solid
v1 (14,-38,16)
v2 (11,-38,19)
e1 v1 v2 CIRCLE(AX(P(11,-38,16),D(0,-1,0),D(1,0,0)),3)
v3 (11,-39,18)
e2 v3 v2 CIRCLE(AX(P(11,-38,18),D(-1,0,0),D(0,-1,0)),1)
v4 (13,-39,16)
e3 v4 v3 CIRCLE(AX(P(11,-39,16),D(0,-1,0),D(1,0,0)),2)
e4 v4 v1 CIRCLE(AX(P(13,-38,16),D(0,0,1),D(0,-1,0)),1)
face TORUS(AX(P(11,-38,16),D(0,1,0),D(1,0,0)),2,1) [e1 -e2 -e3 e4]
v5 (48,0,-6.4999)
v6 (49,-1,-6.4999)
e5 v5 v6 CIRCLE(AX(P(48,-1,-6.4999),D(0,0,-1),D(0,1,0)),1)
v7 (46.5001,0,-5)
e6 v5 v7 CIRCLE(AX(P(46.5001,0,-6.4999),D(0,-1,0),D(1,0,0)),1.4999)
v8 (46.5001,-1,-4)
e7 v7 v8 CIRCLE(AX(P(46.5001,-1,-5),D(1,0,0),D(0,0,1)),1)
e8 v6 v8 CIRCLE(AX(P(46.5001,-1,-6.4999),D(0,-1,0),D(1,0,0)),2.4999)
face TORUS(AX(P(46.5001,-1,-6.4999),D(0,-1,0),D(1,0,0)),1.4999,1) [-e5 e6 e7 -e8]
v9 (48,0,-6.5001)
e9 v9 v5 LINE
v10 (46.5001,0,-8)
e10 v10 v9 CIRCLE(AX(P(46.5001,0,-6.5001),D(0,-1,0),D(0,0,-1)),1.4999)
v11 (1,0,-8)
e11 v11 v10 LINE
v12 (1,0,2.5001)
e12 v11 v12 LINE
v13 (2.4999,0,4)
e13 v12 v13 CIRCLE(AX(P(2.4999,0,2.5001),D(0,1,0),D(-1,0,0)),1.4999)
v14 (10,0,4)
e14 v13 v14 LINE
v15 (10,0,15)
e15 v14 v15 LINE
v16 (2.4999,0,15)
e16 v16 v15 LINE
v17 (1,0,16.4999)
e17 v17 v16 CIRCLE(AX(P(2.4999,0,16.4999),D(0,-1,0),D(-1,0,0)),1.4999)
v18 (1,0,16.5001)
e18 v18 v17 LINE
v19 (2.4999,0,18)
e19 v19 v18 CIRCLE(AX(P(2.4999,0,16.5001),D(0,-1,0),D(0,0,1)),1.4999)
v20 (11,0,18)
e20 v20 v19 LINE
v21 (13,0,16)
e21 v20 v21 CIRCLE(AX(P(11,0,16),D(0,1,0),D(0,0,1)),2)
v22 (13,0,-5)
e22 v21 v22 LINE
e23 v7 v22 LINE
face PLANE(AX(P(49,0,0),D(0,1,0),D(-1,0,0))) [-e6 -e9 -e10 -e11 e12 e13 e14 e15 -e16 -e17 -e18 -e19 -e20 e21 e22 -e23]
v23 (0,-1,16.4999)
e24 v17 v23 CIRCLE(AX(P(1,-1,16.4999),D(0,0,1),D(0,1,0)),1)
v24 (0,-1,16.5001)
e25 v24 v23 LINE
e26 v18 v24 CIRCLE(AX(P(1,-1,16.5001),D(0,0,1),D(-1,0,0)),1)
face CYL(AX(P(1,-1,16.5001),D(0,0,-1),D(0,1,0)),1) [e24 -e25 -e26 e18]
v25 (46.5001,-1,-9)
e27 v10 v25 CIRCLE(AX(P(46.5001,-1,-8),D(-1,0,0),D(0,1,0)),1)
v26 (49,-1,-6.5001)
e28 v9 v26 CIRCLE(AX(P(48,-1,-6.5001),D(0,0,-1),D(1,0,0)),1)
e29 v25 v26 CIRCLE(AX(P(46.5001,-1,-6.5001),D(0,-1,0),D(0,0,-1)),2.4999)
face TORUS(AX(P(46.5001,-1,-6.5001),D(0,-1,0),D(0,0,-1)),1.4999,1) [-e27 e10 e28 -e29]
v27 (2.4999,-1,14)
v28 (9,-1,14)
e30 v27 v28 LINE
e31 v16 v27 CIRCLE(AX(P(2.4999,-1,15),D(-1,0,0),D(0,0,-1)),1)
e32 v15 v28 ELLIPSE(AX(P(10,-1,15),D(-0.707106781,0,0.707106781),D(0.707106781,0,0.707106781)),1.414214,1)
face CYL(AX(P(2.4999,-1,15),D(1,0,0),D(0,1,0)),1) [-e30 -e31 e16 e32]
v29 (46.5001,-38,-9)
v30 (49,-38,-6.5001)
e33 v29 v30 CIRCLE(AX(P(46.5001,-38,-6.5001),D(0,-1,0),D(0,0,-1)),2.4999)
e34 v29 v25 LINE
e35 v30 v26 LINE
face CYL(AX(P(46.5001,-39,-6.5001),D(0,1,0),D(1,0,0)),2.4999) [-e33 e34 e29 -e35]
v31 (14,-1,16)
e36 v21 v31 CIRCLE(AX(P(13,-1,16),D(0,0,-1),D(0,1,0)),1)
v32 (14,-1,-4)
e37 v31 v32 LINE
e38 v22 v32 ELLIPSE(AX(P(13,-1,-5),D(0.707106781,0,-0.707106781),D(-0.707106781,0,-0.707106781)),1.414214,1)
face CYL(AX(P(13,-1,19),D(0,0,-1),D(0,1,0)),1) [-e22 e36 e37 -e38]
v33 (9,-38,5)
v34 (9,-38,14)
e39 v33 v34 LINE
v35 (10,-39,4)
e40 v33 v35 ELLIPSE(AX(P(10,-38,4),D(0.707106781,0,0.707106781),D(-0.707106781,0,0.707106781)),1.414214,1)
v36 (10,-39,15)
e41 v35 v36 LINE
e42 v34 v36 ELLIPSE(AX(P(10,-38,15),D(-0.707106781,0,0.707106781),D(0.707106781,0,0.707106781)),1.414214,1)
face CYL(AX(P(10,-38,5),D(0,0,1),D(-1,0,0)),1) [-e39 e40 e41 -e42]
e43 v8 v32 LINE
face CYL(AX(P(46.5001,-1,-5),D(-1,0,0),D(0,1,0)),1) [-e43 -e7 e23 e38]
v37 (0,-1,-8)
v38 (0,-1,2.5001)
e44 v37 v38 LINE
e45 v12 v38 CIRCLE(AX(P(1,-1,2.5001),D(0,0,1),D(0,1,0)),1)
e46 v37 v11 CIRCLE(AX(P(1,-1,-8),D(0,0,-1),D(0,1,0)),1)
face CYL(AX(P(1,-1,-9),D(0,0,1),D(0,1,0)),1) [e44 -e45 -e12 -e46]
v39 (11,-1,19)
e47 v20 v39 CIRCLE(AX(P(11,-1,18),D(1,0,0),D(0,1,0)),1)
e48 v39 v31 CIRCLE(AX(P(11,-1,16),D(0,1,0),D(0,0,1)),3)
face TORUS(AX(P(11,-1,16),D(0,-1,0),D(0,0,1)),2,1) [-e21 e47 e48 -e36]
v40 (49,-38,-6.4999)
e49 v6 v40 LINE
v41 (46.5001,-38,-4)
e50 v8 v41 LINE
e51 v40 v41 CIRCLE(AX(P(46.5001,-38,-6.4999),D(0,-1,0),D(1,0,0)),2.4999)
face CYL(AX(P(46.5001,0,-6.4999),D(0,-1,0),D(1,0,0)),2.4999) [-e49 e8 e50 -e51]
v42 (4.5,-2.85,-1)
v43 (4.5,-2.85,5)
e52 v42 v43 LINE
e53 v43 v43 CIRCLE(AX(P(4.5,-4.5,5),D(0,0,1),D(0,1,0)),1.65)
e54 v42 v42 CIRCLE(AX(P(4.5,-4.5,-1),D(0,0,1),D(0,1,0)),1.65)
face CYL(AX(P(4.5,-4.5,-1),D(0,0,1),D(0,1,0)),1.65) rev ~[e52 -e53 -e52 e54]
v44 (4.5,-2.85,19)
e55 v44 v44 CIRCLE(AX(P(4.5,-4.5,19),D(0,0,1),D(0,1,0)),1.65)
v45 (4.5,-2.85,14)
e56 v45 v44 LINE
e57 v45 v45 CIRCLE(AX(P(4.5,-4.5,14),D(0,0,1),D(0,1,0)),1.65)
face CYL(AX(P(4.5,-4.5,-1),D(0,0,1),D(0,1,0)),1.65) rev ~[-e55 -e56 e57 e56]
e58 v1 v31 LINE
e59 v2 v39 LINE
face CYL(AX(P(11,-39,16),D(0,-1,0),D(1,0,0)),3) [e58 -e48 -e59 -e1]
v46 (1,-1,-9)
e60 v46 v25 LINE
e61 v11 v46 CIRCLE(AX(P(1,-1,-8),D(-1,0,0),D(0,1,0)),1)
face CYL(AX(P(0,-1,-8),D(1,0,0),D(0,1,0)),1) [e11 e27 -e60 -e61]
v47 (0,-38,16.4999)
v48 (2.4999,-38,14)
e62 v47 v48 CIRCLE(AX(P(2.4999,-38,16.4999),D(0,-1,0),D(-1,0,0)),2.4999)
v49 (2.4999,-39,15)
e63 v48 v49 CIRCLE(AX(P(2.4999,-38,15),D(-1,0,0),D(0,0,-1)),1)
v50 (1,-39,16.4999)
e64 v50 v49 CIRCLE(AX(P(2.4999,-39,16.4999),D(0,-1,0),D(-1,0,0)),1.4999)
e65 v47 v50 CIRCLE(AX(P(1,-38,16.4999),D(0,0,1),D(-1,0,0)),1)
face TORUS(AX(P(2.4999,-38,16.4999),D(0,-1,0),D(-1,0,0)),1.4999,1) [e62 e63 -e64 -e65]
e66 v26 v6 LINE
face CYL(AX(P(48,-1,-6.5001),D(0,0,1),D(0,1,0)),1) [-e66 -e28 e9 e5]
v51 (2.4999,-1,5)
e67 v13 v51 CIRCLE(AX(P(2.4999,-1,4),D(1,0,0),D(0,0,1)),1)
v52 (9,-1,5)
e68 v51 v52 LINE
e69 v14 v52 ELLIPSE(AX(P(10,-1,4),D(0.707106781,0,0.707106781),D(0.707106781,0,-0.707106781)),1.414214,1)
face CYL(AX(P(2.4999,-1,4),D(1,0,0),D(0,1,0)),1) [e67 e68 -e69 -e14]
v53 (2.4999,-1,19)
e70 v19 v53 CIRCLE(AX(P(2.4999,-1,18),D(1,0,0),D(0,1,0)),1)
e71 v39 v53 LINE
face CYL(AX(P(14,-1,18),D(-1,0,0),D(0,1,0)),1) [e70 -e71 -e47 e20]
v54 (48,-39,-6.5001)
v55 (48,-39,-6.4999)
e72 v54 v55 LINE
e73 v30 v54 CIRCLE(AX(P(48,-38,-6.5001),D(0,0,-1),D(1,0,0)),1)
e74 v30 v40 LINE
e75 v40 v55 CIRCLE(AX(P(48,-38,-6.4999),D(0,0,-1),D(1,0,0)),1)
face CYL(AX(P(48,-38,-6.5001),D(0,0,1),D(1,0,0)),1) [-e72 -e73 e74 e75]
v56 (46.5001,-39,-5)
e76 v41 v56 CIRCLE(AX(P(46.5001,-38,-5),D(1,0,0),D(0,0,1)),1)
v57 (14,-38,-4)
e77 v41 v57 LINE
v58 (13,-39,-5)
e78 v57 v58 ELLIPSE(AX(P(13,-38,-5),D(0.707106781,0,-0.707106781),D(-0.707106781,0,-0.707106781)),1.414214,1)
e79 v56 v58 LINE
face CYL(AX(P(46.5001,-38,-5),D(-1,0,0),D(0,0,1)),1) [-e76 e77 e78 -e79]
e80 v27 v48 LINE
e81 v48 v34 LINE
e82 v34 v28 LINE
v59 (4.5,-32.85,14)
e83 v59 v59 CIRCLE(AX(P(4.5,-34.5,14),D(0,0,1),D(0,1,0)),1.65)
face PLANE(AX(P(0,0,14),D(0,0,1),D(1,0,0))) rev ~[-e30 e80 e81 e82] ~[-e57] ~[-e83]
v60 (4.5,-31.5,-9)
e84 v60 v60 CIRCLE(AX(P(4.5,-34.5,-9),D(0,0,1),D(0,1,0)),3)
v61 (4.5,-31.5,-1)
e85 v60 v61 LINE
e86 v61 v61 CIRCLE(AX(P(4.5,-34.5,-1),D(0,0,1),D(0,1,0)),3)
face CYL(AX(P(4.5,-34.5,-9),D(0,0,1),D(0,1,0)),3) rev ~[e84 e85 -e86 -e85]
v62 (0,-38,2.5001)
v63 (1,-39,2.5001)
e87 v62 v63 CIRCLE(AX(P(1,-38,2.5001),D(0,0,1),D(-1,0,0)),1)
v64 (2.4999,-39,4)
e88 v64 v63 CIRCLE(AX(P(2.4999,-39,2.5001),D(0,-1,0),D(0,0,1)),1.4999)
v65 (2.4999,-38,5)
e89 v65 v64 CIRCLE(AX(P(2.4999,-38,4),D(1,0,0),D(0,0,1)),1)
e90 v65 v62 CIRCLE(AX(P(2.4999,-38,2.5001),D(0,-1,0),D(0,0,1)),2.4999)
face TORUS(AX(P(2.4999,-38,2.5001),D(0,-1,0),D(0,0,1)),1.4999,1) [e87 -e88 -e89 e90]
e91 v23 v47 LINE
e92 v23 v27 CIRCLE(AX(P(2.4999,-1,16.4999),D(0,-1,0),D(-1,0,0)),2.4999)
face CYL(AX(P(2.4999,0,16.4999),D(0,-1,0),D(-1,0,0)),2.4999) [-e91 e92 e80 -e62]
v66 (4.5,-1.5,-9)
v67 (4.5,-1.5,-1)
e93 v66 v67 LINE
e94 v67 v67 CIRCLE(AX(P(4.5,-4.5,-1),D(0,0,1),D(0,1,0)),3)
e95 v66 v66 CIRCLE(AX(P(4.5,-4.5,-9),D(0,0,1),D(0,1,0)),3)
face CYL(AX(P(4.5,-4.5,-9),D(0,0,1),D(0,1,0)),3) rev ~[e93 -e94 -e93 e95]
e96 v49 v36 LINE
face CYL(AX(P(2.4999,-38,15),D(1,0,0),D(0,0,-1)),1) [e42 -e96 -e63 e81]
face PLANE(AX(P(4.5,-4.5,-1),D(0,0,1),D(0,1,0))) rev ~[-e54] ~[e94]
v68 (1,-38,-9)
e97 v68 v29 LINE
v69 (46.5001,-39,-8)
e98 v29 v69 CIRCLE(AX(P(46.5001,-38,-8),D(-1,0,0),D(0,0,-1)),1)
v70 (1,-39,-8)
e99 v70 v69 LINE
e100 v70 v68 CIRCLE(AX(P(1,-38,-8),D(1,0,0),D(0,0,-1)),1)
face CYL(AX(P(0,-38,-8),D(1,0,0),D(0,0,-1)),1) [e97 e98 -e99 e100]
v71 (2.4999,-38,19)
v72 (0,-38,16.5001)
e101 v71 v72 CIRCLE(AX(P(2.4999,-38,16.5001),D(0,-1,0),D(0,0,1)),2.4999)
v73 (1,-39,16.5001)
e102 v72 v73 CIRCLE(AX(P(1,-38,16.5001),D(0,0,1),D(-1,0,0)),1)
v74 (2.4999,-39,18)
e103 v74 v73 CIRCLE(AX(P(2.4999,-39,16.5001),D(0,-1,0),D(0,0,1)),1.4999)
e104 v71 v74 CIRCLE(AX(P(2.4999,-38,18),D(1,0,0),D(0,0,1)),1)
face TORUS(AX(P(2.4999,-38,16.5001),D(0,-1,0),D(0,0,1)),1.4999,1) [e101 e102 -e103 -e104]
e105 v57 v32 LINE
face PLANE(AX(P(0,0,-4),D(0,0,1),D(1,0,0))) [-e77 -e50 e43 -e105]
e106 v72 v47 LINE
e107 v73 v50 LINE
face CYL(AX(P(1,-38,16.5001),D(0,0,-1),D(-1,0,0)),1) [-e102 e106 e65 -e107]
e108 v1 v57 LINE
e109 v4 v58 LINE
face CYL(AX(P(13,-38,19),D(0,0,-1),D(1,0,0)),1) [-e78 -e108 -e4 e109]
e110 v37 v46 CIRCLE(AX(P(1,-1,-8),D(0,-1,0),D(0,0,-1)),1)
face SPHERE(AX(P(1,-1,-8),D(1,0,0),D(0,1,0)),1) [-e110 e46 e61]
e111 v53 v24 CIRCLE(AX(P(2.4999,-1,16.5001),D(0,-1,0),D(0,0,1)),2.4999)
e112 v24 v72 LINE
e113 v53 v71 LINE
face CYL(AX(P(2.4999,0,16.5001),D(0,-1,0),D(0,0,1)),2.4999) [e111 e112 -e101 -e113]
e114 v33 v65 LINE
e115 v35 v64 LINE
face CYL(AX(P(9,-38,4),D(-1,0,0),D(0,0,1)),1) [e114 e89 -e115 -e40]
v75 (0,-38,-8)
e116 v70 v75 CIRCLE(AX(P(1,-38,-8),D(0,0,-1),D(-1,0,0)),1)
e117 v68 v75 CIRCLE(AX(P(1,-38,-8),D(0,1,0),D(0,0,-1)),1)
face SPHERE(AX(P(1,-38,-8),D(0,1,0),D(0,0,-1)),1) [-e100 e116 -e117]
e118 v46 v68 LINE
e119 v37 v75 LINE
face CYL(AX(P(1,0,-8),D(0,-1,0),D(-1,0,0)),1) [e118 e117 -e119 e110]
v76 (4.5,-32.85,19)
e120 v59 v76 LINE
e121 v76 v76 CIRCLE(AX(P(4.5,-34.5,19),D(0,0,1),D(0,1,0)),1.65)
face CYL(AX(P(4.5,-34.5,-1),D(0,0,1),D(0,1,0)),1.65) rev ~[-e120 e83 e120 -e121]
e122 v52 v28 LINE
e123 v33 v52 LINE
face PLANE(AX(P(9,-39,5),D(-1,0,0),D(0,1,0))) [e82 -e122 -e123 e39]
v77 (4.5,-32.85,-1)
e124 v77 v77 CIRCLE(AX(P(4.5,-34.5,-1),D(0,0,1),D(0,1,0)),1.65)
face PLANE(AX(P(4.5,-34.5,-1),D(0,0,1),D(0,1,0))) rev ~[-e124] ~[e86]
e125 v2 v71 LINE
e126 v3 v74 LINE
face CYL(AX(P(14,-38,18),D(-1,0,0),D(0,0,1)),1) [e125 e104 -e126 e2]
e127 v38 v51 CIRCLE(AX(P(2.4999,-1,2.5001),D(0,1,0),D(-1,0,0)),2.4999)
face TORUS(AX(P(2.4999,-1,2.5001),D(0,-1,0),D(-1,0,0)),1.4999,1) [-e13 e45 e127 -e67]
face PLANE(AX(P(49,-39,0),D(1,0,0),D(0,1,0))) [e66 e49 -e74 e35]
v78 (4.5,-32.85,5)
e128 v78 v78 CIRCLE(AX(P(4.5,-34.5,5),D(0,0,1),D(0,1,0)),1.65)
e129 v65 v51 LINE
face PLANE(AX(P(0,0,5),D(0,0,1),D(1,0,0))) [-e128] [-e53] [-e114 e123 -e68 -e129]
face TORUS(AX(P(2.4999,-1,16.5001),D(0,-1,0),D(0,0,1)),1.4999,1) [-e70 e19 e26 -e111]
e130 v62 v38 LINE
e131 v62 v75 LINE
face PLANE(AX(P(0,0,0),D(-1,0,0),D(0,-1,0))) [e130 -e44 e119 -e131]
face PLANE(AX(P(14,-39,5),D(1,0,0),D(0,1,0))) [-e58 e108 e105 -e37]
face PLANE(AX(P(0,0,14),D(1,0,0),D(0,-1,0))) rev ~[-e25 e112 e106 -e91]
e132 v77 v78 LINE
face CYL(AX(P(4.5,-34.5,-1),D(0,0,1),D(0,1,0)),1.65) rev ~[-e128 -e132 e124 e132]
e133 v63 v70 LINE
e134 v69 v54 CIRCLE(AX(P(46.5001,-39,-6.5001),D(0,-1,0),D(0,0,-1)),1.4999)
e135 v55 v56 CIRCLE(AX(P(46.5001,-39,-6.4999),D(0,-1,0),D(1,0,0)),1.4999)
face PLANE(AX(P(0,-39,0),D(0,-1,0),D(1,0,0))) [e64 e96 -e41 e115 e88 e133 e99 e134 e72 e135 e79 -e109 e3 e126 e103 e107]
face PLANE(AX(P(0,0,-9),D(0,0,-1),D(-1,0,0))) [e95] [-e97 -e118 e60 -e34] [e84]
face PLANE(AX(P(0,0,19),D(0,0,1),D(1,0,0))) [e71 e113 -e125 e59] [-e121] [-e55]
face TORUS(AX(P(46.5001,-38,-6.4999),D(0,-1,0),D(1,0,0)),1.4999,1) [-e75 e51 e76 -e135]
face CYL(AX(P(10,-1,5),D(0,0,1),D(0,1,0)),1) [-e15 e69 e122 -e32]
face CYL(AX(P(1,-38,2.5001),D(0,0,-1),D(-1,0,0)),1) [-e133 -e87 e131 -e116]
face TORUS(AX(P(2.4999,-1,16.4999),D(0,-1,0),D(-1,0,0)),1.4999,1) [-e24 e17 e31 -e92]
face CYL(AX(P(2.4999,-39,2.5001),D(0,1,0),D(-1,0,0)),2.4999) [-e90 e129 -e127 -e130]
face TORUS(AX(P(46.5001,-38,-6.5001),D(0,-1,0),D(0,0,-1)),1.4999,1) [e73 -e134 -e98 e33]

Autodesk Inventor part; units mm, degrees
ref_plane "YZ Plane" through (0, 0, 0) normal (1, 0, 0) x (0, 1, 0)
ref_plane "XZ Plane" through (0, 0, 0) normal (0, 1, 0) x (-1, 0, 0)
ref_plane "XY Plane" through (0, 0, 0) normal (0, 0, 1) x (1, 0, 0)
sketch "スケッチ1" plane through (0, 0, 0) normal (0, 0, 1) x (1, 0, 0)
  line L0 (0, 0) -> (49, 0)
  line L1 (49, 0) -> (49, -39)
  line L2 (49, -39) -> (0, -39)
  line L3 (0, -39) -> (0, 0)
  dimension "d2" = 39
  dimension "d3" = 49
extrude "押し出し1" add sketch "スケッチ1" along normal blind 5
sketch "スケッチ2" plane through (0, 0, 5) normal (0, 0, 1) x (1, 0, 0)
  line L0 (49, 0) -> (0, 0) projected
  line L1 (9, 0) -> (14, 0)
  line L2 (14, 0) -> (14, -39)
  line L3 (14, -39) -> (9, -39)
  line L4 (9, -39) -> (9, 0)
  line L5 (0, 0) -> (0, -39) projected
  dimension "d4" = 5
  dimension "d5" = 39
  dimension "d6" = 9
extrude "押し出し2" add sketch "スケッチ2" along normal blind 9
sketch "スケッチ3" plane through (0, 0, 14) normal (0, 0, 1) x (1, 0, 0)
  line L0 (0, -39) -> (9, -39) projected
  line L1 (14, 0) -> (0, 0)
  line L2 (0, 0) -> (0, -39)
  line L3 (0, -39) -> (14, -39)
  line L4 (14, -39) -> (14, 0)
  point P0 (0, 0)
extrude "押し出し3" add sketch "スケッチ3" along normal blind 5
sketch "スケッチ4" plane through (0, 0, 0) normal (0, 0, -1) x (-1, 0, 0)
  line L0 (-49, 0) -> (-14, 0) projected
  line L1 (0, -39) -> (-49, -39) projected
  line L2 (-49, 0) -> (0, 0)
  line L3 (0, 0) -> (0, -39)
  line L4 (0, -39) -> (-49, -39)
  line L5 (-49, -39) -> (-49, 0)
  point P0 (0, 0)
extrude "押し出し4" add sketch "スケッチ4" along normal blind 9
sketch "スケッチ5" plane through (0, 0, 5) normal (0, 0, 1) x (1, 0, 0)
  line L0 (49, 0) -> (14, 0) projected
  line L1 (14, 0) -> (49, 0)
  line L2 (49, 0) -> (49, -39)
  line L3 (49, -39) -> (14, -39)
  line L4 (14, -39) -> (14, 0)
  point P0 (0, 0)
extrude "押し出し5" cut sketch "スケッチ5" against normal blind 9
fillet "フィレット1" radius 2.5 2 edges at (49, -19.5, -4) (49, -19.5, -9)
fillet "フィレット2" radius 2.5 3 edges at (0, -19.5, 19) (0, -19.5, 14) (0, -19.5, 5)
sketch "スケッチ6" plane through (0, 0, -9) normal (0, 0, -1) x (-1, 0, 0)
  line L0 (0, 0) -> (-46.5, 0) projected
  line L1 (-46.5, -39) -> (0, -39) projected
  line L2 (0, -39) -> (0, 0) projected
  point P0 (-4.5, -4.5)
  point P1 (-4.5, -34.5)
  dimension "d17" = 4.5
  dimension "d18" = 4.5
  dimension "d19" = 4.5
  dimension "d20" = 4.5
hole "穴1" at (4.5, -4.5, -9) at (4.5, -34.5, -9) direction (0, 0, 1) diameter 3.3 end through all counterbore diameter 6 counterbore depth 8
fillet "フィレット5" radius 1 23 edges at (48.2678, 0, -4.7322) (30.2501, 0, -4) (23.25, 0, -9) (0.7322, 0, 4.2678) (5.7499, 0, 5) (0, 0, -3.2499) (9, 0, 9.5) (14, 0, 7.5) (0.7322, 0, 18.2678) (5.75, 0, 14) (8.25, 0, 19) (0, -19.5, -9) (48.2678, -39, -4.7322) (30.2501, -39, -4) (23.2501, -39, -9) (9, -39, 9.5) (0.7322, -39, 18.2678) (8.25, -39, 19) (5.75, -39, 14) (5.75, -39, 5) (0, -39, -3.25) (0.7322, -39, 4.2678) (14, -39, 7.5)
fillet "フィレット6" radius 3 3 edges at (13.7071, -0.2929, 18.7071) (13.7071, -38.7071, 18.7071) (14, -19.5, 19)
equation "\"d18\" = d17"
equation "\"d19\" = d18"
equation "\"d20\" = d17"
properties part number "ハンド3D_L" material "ABS プラスチック"
